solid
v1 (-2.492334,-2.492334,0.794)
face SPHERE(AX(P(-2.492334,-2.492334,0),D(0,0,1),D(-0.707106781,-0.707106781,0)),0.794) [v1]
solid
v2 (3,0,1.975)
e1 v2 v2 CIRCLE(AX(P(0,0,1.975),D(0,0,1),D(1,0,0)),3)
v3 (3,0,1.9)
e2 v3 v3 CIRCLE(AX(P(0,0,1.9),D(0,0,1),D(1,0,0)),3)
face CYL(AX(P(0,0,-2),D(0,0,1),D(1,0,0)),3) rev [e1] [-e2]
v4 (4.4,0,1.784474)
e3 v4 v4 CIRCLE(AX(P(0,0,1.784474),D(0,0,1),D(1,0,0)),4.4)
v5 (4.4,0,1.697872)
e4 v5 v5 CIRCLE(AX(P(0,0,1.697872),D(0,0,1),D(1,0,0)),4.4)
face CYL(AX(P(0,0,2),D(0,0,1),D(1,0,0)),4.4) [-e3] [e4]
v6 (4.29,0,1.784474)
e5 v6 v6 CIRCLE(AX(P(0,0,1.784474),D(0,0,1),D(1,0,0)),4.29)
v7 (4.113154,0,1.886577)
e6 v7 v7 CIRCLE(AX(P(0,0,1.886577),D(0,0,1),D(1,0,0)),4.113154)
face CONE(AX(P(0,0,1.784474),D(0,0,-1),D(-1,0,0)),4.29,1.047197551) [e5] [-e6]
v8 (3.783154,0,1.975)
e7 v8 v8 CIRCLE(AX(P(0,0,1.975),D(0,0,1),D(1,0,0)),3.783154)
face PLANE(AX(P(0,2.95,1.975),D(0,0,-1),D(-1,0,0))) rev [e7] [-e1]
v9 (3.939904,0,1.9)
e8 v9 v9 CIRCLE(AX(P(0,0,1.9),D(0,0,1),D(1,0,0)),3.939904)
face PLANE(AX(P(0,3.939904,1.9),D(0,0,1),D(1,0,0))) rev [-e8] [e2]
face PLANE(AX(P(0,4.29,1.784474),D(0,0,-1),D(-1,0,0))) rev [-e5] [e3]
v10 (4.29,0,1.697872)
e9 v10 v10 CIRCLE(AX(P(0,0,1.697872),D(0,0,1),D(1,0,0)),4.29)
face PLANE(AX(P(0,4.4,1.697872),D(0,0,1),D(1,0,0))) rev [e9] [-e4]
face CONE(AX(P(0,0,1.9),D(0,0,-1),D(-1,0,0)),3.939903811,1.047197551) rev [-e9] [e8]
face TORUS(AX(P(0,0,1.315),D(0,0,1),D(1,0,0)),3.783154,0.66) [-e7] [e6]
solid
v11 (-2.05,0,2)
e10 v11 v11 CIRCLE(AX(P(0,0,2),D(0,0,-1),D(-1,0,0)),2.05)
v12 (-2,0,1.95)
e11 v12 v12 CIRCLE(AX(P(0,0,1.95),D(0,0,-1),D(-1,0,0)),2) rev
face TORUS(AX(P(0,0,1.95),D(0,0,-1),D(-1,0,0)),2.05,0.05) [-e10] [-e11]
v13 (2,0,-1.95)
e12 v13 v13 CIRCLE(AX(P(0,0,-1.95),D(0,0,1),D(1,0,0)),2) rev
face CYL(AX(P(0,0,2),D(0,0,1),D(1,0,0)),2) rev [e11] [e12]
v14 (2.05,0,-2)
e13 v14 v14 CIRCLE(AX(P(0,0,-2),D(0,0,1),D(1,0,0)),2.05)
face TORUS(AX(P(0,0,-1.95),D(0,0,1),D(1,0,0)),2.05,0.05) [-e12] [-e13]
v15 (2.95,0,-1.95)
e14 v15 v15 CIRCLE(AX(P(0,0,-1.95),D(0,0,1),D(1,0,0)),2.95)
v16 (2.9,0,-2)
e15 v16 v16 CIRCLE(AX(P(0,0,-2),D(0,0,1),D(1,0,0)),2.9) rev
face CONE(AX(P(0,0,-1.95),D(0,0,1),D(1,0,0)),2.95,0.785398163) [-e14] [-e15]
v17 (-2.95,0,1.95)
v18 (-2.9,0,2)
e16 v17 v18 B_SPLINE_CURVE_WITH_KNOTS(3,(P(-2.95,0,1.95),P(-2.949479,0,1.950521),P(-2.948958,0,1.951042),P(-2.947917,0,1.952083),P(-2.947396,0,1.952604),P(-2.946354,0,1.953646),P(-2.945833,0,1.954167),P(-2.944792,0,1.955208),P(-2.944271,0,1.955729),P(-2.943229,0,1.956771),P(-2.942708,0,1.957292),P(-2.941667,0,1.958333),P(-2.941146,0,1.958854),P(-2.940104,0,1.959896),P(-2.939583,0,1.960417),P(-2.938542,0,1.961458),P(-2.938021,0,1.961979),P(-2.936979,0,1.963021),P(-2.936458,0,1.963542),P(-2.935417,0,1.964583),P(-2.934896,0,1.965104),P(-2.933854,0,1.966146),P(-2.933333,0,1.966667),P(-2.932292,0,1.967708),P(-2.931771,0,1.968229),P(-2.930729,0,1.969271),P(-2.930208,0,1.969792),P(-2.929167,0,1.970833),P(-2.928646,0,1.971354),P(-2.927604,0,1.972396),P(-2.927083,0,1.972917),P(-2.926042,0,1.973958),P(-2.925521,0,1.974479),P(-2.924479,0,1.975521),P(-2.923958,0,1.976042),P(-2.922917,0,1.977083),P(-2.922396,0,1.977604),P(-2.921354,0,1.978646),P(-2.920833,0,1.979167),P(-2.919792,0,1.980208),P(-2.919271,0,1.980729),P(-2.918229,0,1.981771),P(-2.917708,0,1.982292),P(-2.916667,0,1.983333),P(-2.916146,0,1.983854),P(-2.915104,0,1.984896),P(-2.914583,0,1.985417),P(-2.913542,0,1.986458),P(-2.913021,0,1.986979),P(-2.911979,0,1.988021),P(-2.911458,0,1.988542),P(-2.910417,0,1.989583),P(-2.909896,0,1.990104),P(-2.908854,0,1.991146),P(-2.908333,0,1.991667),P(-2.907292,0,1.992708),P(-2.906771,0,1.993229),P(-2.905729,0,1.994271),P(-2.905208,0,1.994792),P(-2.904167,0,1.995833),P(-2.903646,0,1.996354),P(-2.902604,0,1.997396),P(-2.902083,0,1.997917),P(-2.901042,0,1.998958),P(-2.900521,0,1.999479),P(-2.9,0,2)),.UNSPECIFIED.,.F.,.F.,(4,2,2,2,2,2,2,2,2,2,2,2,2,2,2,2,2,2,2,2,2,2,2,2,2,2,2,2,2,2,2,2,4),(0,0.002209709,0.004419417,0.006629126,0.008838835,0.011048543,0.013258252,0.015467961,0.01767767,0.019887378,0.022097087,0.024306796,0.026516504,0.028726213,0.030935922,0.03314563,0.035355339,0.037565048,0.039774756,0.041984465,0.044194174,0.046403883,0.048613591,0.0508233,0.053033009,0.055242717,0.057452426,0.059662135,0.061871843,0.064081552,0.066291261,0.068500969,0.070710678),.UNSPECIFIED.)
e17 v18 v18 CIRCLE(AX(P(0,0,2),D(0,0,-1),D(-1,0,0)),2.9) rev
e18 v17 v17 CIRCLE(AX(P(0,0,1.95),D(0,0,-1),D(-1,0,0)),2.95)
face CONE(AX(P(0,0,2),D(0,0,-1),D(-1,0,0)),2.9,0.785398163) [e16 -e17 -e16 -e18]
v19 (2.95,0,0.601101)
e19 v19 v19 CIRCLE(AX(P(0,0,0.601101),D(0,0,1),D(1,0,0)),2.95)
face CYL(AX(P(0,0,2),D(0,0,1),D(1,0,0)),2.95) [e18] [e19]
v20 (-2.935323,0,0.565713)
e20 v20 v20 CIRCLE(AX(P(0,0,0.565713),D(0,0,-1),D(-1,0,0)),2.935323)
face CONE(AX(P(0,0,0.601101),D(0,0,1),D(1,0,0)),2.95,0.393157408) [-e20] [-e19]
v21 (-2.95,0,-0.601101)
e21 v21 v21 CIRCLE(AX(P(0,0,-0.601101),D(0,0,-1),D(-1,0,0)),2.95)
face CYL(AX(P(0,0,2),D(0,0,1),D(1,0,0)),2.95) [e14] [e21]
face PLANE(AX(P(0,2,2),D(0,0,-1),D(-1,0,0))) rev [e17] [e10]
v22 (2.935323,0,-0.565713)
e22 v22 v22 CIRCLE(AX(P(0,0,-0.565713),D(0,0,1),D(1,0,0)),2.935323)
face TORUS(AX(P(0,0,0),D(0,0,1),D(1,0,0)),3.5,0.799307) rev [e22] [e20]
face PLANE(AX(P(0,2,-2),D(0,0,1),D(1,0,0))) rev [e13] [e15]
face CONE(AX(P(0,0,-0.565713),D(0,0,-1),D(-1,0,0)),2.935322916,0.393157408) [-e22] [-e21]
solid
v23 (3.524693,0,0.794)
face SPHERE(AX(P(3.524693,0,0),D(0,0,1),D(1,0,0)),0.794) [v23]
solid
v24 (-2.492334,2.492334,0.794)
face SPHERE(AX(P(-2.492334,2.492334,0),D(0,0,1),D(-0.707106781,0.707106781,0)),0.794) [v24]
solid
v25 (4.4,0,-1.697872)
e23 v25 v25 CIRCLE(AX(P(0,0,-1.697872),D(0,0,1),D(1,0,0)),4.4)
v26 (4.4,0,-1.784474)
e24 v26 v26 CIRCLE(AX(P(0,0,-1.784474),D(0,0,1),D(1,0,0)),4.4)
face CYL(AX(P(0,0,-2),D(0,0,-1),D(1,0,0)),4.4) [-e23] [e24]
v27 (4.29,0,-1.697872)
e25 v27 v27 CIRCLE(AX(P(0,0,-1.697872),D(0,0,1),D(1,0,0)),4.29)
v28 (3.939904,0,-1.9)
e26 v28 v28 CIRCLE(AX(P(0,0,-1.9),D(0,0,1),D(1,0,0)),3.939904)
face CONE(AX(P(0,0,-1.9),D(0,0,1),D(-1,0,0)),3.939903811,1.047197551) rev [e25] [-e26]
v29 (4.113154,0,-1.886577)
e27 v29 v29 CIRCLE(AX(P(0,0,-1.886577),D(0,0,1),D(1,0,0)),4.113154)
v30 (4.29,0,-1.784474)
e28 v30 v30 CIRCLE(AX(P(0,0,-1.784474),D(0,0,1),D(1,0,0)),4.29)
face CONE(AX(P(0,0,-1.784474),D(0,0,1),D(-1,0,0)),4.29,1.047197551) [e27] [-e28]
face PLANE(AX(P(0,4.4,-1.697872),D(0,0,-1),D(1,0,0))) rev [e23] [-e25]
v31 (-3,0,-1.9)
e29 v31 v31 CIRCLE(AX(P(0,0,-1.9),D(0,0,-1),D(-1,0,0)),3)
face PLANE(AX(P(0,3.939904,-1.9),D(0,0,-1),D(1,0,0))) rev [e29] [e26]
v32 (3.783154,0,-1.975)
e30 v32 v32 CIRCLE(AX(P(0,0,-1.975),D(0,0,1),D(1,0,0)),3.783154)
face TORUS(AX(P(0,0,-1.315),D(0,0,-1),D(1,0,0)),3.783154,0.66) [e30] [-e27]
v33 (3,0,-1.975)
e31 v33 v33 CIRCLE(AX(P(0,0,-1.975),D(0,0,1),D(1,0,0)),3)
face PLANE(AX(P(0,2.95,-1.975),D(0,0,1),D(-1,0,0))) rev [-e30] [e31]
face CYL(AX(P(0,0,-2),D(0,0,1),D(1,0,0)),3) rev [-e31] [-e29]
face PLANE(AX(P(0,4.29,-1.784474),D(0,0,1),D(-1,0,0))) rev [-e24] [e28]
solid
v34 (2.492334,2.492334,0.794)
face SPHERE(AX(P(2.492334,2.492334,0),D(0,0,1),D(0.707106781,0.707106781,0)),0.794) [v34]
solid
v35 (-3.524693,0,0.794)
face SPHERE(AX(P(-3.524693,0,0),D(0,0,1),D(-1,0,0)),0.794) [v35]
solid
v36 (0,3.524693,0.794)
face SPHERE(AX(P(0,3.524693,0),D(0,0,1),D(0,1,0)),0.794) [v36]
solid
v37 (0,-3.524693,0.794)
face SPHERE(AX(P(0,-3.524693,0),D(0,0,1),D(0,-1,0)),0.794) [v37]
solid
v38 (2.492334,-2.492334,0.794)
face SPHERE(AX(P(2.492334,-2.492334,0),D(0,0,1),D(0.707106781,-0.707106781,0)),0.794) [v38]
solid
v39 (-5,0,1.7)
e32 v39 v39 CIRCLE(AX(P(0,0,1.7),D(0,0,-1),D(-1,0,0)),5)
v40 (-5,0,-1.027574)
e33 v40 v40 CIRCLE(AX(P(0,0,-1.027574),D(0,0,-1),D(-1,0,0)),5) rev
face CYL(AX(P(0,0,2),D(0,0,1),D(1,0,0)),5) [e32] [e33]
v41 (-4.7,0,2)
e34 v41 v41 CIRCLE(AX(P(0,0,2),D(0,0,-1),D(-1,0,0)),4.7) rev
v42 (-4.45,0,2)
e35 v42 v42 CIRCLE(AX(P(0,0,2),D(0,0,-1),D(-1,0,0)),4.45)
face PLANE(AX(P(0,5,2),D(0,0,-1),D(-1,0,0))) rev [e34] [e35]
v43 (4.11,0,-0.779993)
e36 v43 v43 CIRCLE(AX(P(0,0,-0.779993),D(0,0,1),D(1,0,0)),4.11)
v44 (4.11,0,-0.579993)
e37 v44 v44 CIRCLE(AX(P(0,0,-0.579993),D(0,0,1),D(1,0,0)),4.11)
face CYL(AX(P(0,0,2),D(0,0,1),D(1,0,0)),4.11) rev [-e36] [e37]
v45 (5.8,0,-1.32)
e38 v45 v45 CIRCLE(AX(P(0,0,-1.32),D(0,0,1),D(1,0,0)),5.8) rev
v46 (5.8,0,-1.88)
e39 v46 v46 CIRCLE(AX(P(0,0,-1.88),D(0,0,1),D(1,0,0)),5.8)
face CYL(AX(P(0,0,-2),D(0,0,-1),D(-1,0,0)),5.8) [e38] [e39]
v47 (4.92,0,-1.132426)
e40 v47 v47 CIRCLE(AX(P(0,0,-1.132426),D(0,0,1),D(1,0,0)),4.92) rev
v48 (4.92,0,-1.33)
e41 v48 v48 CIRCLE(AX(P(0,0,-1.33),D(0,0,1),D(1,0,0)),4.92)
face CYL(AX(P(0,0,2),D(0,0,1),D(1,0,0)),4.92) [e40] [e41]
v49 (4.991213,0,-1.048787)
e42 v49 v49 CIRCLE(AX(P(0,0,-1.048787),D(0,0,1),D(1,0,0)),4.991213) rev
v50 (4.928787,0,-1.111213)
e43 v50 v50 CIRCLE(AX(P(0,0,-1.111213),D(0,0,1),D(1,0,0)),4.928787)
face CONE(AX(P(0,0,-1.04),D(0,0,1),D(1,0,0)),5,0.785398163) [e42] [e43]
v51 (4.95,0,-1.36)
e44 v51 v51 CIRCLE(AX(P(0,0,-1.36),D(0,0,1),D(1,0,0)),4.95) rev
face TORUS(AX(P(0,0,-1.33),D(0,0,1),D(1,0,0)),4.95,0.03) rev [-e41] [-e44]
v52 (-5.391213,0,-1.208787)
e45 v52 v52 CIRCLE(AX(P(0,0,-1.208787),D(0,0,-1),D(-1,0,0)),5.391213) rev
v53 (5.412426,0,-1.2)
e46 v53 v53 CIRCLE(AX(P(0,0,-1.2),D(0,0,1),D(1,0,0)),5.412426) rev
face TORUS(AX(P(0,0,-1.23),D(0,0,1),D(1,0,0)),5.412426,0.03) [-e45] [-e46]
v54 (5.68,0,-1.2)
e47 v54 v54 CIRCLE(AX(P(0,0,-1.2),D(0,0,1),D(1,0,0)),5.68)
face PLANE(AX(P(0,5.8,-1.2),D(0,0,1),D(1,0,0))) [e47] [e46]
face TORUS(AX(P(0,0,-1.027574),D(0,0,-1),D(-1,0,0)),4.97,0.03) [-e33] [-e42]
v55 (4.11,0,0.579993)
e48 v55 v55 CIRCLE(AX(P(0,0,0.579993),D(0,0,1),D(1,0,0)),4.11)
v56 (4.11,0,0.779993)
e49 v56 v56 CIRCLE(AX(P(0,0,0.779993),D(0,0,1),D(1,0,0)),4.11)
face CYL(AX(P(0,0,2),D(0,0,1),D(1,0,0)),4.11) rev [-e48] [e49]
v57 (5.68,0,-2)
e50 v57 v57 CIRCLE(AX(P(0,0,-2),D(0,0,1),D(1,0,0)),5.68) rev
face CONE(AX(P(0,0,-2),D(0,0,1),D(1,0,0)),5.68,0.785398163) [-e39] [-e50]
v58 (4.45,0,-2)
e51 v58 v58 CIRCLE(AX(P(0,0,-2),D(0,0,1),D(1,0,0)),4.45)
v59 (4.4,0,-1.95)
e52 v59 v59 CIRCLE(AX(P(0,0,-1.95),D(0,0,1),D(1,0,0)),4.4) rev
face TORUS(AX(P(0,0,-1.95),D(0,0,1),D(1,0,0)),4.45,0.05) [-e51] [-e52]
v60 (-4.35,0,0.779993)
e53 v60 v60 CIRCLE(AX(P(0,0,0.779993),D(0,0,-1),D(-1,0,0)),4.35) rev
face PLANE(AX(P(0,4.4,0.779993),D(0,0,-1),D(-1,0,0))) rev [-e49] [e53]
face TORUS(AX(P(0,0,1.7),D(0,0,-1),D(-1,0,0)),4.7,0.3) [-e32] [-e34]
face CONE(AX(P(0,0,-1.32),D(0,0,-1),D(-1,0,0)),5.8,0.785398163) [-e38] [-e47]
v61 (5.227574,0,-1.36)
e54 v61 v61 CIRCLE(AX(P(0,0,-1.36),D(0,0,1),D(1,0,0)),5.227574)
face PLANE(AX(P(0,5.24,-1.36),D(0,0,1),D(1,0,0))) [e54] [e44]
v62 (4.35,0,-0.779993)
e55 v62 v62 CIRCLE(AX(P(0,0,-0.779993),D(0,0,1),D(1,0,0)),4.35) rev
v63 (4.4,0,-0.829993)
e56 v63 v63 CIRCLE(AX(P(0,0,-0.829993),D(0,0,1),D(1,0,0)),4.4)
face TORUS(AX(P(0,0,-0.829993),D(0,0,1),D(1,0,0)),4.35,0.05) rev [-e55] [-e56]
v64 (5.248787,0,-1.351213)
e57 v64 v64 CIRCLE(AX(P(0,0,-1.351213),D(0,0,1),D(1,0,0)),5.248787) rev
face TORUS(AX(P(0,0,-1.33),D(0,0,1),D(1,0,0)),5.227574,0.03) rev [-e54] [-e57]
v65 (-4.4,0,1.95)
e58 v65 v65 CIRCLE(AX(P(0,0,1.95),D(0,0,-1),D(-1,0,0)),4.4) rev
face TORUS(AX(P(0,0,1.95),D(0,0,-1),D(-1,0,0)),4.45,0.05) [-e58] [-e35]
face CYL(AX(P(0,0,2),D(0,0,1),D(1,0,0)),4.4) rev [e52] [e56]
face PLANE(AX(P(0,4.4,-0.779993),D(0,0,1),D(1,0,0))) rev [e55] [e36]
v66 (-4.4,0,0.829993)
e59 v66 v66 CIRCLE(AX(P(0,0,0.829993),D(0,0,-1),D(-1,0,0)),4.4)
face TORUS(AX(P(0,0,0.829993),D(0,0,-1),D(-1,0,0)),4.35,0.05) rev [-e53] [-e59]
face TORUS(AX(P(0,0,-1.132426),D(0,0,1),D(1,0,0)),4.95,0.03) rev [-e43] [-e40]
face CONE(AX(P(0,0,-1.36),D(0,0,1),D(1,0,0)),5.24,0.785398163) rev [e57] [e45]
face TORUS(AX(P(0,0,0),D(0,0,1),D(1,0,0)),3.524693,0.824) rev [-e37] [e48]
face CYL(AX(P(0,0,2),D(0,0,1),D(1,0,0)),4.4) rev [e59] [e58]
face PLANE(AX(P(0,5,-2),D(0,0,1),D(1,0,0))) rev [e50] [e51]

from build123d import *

# Parameters (mm, degrees)
CIRPATTERN1_COUNT  = 8
SKETCH9_R          = 3
CUT_EXTRUDE1_DEPTH = 9.111758441
SKETCH7_W          = 0.8
SKETCH7_H          = 1.4
FILLET2_R          = 0.3
FILLET3_R          = 0.05
FILLET5_R          = 0.03
CHAMFER1_SIZE      = 0.12
FILLET7_R          = 0.05


with BuildPart() as part:
    # Sketch3 → Revolve1 (revolve)
    with BuildSketch(Plane(origin=(0, 0, 0), x_dir=(0, 0, -1), z_dir=(1, 0, 0)), mode=Mode.PRIVATE) as revolve1_sk:
        with BuildLine():
            Line((-2, 5), (-2, 4.4))
            Line((-2, 4.4), (-0.779992845, 4.4))
            Line((-0.779992845, 4.4), (-0.779992845, 4.11))
            Line((-0.779992845, 4.11), (-0.579992845, 4.11))
            ThreePointArc((-0.579992845, 4.11), (0, 4.348692987), (0.579992845, 4.11))
            Line((0.579992845, 4.11), (0.779992845, 4.11))
            Line((0.779992845, 4.11), (0.779992845, 4.4))
            Line((0.779992845, 4.4), (2, 4.4))
            Line((2, 4.4), (2, 5))
            Line((2, 5), (-2, 5))
        make_face()
        with BuildLine():
            Line((2, 2), (-2, 2))
            Line((-2, 2), (-2, 2.95))
            Line((-2, 2.95), (-0.579992845, 2.95))
            ThreePointArc((-0.579992845, 2.95), (0, 2.700692987), (0.579992845, 2.95))
            Line((0.579992845, 2.95), (2, 2.95))
            Line((2, 2.95), (2, 2))
        make_face()
    revolve(revolve1_sk.sketch.rotate(Axis((0, 0, 2), (0, 0, -1)), 90), axis=Axis((0, 0, 2), (0, 0, -1)))

    # Sketch7 → Revolve5 (revolve)
    with BuildSketch(Plane(origin=(0, 0, 0), x_dir=(0, 0, -1), z_dir=(1, 0, 0)), mode=Mode.PRIVATE) as revolve5_sk:
        with Locations((1.6, 5.1)):
            Rectangle(SKETCH7_W, SKETCH7_H)
    revolve(revolve5_sk.sketch.rotate(Axis((0, 0, -2), (0, 0, 1)), 270), axis=Axis((0, 0, -2), (0, 0, 1)))

    # Fillet2
    fillet2_edges = [part.edges().sort_by_distance(p)[0] for p in [
        (-5, 0, 2),
    ]]
    fillet(fillet2_edges, radius=FILLET2_R)

    # Fillet3
    fillet3_edges = [part.edges().sort_by_distance(p)[0] for p in [
        (-4.4, 0, 0.779992845),
        (-4.4, 0, 2),
        (-4.4, 0, -2),
        (-4.4, 0, -0.779992845),
    ]]
    fillet(fillet3_edges, radius=FILLET3_R)

    # Fillet6
    # the kernel refuses this chamfer: 0.05 mm, written as the material it takes off along each edge
    with BuildSketch(Plane(origin=(0, 0, 2), x_dir=(1, 0, 0), z_dir=(0, 1, 0))) as fillet6_piece_1:
        with BuildLine():
            Line((2.898585786, -0.001414214), (2.951414214, 0.051414214))
            Line((2.951414214, 0.051414214), (2.952414214, 0.051414214))
            ThreePointArc((2.952414214, 0.051414214), (2.951, 0.025707107), (2.951, 0))
            Line((2.951, 0), (2.95, -0.001))
            ThreePointArc((2.95, -0.001), (2.924292893, -0.001), (2.898585786, -0.002414214))
            Line((2.898585786, -0.002414214), (2.898585786, -0.001414214))
        make_face()
    revolve(axis=Axis((0, 0, 2), (0, 0, -1)), mode=Mode.SUBTRACT)
    with BuildSketch(Plane(origin=(0, 0, 0.579992845), x_dir=(1, 0, 0), z_dir=(0, 1, 0))) as fillet6_piece_2:
        with BuildLine():
            Line((2.950766214, -0.022955554), (2.934556702, 0.016126995))
            Line((2.934556702, 0.016126995), (2.93526316, 0.016834749))
            ThreePointArc((2.93526316, 0.016834749), (2.942655386, 0.008450137), (2.950688096, 0.00072562))
            Line((2.950688096, 0.00072562), (2.951, 0))
            ThreePointArc((2.951, 0), (2.951, -0.011477777), (2.951766214, -0.022955554))
            Line((2.951766214, -0.022955554), (2.950766214, -0.022955554))
        make_face()
    revolve(axis=Axis((0, 0, 0.579992845), (0, 0, -1)), mode=Mode.SUBTRACT)
    with BuildSketch(Plane(origin=(0, 0, -0.579992845), x_dir=(1, 0, 0), z_dir=(0, 1, 0))) as fillet6_piece_3:
        with BuildLine():
            Line((2.950766214, 0.022955554), (2.934556702, -0.016126995))
            Line((2.934556702, -0.016126995), (2.93526316, -0.016834749))
            ThreePointArc((2.93526316, -0.016834749), (2.942655386, -0.008450137), (2.950688096, -0.00072562))
            Line((2.950688096, -0.00072562), (2.951, 0))
            ThreePointArc((2.951, 0), (2.951, 0.011477777), (2.951766214, 0.022955554))
            Line((2.951766214, 0.022955554), (2.950766214, 0.022955554))
        make_face()
    revolve(axis=Axis((0, 0, -0.579992845), (0, 0, -1)), mode=Mode.SUBTRACT)
    with BuildSketch(Plane(origin=(0, 0, -2), x_dir=(1, 0, 0), z_dir=(0, 1, 0))) as fillet6_piece_4:
        with BuildLine():
            Line((2.951414214, -0.051414214), (2.898585786, 0.001414214))
            Line((2.898585786, 0.001414214), (2.898585786, 0.002414214))
            ThreePointArc((2.898585786, 0.002414214), (2.924292893, 0.001), (2.95, 0.001))
            Line((2.95, 0.001), (2.951, 0))
            ThreePointArc((2.951, 0), (2.951, -0.025707107), (2.952414214, -0.051414214))
            Line((2.952414214, -0.051414214), (2.951414214, -0.051414214))
        make_face()
    revolve(axis=Axis((0, 0, -2), (0, 0, -1)), mode=Mode.SUBTRACT)

    # Sketch8 → Cut-Revolve1 (revolve, cut)
    with BuildSketch(Plane(origin=(0, 0, 0), x_dir=(0, 0, -1), z_dir=(1, 0, 0)), mode=Mode.PRIVATE) as cut_revolve1_sk:
        Polygon((1.2, 5.4), (1.36, 5.24), (1.36, 4.92), (1.12, 4.92), (1.04, 5), (1.2, 5), align=None)
    revolve(cut_revolve1_sk.sketch.rotate(Axis((0, 0, 2), (0, 0, -1)), 270), axis=Axis((0, 0, 2), (0, 0, -1)), mode=Mode.SUBTRACT)

    # Fillet5
    fillet5_edges = [part.edges().sort_by_distance(p)[0] for p in [
        (5.4, 0, -1.2),
        (0, 5, -1.04),
        (4.92, 0, -1.12),
        (4.92, 0, -1.36),
        (5.24, 0, -1.36),
    ]]
    fillet(fillet5_edges, radius=FILLET5_R)

    # Chamfer1
    chamfer1_edges = [part.edges().sort_by_distance(p)[0] for p in [
        (-5.8, 0, -2),
        (-5.8, 0, -1.2),
    ]]
    chamfer(chamfer1_edges, length=CHAMFER1_SIZE)

    # Fillet7
    fillet7_edges = [part.edges().sort_by_distance(p)[0] for p in [
        (-2, 0, -2),
        (-2, 0, 2),
    ]]
    fillet(fillet7_edges, radius=FILLET7_R)


with BuildPart() as body_2:
    # Sketch5 → Revolve3 (revolve)
    with BuildSketch(Plane(origin=(0, 0, 0), x_dir=(0, 0, -1), z_dir=(1, 0, 0))):
        with BuildLine():
            Line((-0.794, 3.524692987), (0.794, 3.524692987))
            ThreePointArc((0.794, 3.524692987), (0, 4.318692987), (-0.794, 3.524692987))
        make_face()
    revolve(axis=Axis((0, 3.524692987, 0.794), (0, 0, -1)))


with BuildPart() as cirpattern1_1:
    # CirPattern1: pattern copy
    add(body_2.part.rotate(Axis((0, 0, 0), (0, 0, 1)), 1 * 360 / CIRPATTERN1_COUNT))


with BuildPart() as cirpattern1_2:
    # CirPattern1: pattern copy
    add(body_2.part.rotate(Axis((0, 0, 0), (0, 0, 1)), 2 * 360 / CIRPATTERN1_COUNT))


with BuildPart() as cirpattern1_3:
    # CirPattern1: pattern copy
    add(body_2.part.rotate(Axis((0, 0, 0), (0, 0, 1)), 3 * 360 / CIRPATTERN1_COUNT))


with BuildPart() as cirpattern1_4:
    # CirPattern1: pattern copy
    add(body_2.part.rotate(Axis((0, 0, 0), (0, 0, 1)), 4 * 360 / CIRPATTERN1_COUNT))


with BuildPart() as cirpattern1_5:
    # CirPattern1: pattern copy
    add(body_2.part.rotate(Axis((0, 0, 0), (0, 0, 1)), 5 * 360 / CIRPATTERN1_COUNT))


with BuildPart() as cirpattern1_6:
    # CirPattern1: pattern copy
    add(body_2.part.rotate(Axis((0, 0, 0), (0, 0, 1)), 6 * 360 / CIRPATTERN1_COUNT))


with BuildPart() as cirpattern1_7:
    # CirPattern1: pattern copy
    add(body_2.part.rotate(Axis((0, 0, 0), (0, 0, 1)), 7 * 360 / CIRPATTERN1_COUNT))


with BuildPart() as body_10:
    # Sketch6 → Revolve4 (revolve)
    with BuildSketch(Plane(origin=(0, 0, 0), x_dir=(0, 0, -1), z_dir=(1, 0, 0)), mode=Mode.PRIVATE) as revolve4_sk:
        with BuildLine():
            Line((-1.975, 2.95), (-1.975, 3.783153533))
            ThreePointArc((-1.975, 3.783153533), (-1.952511045, 3.953974103), (-1.886576766, 4.113153533))
            Line((-1.886576766, 4.113153533), (-1.784474411, 4.29))
            Line((-1.784474411, 4.29), (-1.784474411, 4.4))
            Line((-1.784474411, 4.4), (-1.697871871, 4.4))
            Line((-1.697871871, 4.4), (-1.697871871, 4.29))
            Line((-1.697871871, 4.29), (-1.9, 3.939903811))
            Line((-1.9, 3.939903811), (-1.9, 2.95))
            Line((-1.9, 2.95), (-1.975, 2.95))
        make_face()
    revolve(revolve4_sk.sketch.rotate(Axis((0, 0, 2), (0, 0, -1)), 90), axis=Axis((0, 0, 2), (0, 0, -1)))


with BuildPart() as body_11:
    # Mirror1: mirrored copy
    add(body_10.part.mirror(Plane.XY))


with BuildPart() as cut_extrude1_tool:
    # Sketch9 → Cut-Extrude1 (new, through all)
    with BuildSketch(Plane.XY.offset(1.975)):
        Circle(SKETCH9_R)
    extrude(amount=-CUT_EXTRUDE1_DEPTH)


with BuildPart() as body_10_1:
    add(body_10.part)

    # Cut-Extrude1: cut by cut_extrude1_tool
    add(cut_extrude1_tool.part, mode=Mode.SUBTRACT)


with BuildPart() as body_11_1:
    add(body_11.part)

    # Cut-Extrude1: cut by cut_extrude1_tool
    add(cut_extrude1_tool.part, mode=Mode.SUBTRACT)


solid = Compound([part.part, body_2.part, cirpattern1_1.part, cirpattern1_2.part, cirpattern1_3.part, cirpattern1_4.part, cirpattern1_5.part, cirpattern1_6.part, cirpattern1_7.part, body_10_1.part, body_11_1.part])
